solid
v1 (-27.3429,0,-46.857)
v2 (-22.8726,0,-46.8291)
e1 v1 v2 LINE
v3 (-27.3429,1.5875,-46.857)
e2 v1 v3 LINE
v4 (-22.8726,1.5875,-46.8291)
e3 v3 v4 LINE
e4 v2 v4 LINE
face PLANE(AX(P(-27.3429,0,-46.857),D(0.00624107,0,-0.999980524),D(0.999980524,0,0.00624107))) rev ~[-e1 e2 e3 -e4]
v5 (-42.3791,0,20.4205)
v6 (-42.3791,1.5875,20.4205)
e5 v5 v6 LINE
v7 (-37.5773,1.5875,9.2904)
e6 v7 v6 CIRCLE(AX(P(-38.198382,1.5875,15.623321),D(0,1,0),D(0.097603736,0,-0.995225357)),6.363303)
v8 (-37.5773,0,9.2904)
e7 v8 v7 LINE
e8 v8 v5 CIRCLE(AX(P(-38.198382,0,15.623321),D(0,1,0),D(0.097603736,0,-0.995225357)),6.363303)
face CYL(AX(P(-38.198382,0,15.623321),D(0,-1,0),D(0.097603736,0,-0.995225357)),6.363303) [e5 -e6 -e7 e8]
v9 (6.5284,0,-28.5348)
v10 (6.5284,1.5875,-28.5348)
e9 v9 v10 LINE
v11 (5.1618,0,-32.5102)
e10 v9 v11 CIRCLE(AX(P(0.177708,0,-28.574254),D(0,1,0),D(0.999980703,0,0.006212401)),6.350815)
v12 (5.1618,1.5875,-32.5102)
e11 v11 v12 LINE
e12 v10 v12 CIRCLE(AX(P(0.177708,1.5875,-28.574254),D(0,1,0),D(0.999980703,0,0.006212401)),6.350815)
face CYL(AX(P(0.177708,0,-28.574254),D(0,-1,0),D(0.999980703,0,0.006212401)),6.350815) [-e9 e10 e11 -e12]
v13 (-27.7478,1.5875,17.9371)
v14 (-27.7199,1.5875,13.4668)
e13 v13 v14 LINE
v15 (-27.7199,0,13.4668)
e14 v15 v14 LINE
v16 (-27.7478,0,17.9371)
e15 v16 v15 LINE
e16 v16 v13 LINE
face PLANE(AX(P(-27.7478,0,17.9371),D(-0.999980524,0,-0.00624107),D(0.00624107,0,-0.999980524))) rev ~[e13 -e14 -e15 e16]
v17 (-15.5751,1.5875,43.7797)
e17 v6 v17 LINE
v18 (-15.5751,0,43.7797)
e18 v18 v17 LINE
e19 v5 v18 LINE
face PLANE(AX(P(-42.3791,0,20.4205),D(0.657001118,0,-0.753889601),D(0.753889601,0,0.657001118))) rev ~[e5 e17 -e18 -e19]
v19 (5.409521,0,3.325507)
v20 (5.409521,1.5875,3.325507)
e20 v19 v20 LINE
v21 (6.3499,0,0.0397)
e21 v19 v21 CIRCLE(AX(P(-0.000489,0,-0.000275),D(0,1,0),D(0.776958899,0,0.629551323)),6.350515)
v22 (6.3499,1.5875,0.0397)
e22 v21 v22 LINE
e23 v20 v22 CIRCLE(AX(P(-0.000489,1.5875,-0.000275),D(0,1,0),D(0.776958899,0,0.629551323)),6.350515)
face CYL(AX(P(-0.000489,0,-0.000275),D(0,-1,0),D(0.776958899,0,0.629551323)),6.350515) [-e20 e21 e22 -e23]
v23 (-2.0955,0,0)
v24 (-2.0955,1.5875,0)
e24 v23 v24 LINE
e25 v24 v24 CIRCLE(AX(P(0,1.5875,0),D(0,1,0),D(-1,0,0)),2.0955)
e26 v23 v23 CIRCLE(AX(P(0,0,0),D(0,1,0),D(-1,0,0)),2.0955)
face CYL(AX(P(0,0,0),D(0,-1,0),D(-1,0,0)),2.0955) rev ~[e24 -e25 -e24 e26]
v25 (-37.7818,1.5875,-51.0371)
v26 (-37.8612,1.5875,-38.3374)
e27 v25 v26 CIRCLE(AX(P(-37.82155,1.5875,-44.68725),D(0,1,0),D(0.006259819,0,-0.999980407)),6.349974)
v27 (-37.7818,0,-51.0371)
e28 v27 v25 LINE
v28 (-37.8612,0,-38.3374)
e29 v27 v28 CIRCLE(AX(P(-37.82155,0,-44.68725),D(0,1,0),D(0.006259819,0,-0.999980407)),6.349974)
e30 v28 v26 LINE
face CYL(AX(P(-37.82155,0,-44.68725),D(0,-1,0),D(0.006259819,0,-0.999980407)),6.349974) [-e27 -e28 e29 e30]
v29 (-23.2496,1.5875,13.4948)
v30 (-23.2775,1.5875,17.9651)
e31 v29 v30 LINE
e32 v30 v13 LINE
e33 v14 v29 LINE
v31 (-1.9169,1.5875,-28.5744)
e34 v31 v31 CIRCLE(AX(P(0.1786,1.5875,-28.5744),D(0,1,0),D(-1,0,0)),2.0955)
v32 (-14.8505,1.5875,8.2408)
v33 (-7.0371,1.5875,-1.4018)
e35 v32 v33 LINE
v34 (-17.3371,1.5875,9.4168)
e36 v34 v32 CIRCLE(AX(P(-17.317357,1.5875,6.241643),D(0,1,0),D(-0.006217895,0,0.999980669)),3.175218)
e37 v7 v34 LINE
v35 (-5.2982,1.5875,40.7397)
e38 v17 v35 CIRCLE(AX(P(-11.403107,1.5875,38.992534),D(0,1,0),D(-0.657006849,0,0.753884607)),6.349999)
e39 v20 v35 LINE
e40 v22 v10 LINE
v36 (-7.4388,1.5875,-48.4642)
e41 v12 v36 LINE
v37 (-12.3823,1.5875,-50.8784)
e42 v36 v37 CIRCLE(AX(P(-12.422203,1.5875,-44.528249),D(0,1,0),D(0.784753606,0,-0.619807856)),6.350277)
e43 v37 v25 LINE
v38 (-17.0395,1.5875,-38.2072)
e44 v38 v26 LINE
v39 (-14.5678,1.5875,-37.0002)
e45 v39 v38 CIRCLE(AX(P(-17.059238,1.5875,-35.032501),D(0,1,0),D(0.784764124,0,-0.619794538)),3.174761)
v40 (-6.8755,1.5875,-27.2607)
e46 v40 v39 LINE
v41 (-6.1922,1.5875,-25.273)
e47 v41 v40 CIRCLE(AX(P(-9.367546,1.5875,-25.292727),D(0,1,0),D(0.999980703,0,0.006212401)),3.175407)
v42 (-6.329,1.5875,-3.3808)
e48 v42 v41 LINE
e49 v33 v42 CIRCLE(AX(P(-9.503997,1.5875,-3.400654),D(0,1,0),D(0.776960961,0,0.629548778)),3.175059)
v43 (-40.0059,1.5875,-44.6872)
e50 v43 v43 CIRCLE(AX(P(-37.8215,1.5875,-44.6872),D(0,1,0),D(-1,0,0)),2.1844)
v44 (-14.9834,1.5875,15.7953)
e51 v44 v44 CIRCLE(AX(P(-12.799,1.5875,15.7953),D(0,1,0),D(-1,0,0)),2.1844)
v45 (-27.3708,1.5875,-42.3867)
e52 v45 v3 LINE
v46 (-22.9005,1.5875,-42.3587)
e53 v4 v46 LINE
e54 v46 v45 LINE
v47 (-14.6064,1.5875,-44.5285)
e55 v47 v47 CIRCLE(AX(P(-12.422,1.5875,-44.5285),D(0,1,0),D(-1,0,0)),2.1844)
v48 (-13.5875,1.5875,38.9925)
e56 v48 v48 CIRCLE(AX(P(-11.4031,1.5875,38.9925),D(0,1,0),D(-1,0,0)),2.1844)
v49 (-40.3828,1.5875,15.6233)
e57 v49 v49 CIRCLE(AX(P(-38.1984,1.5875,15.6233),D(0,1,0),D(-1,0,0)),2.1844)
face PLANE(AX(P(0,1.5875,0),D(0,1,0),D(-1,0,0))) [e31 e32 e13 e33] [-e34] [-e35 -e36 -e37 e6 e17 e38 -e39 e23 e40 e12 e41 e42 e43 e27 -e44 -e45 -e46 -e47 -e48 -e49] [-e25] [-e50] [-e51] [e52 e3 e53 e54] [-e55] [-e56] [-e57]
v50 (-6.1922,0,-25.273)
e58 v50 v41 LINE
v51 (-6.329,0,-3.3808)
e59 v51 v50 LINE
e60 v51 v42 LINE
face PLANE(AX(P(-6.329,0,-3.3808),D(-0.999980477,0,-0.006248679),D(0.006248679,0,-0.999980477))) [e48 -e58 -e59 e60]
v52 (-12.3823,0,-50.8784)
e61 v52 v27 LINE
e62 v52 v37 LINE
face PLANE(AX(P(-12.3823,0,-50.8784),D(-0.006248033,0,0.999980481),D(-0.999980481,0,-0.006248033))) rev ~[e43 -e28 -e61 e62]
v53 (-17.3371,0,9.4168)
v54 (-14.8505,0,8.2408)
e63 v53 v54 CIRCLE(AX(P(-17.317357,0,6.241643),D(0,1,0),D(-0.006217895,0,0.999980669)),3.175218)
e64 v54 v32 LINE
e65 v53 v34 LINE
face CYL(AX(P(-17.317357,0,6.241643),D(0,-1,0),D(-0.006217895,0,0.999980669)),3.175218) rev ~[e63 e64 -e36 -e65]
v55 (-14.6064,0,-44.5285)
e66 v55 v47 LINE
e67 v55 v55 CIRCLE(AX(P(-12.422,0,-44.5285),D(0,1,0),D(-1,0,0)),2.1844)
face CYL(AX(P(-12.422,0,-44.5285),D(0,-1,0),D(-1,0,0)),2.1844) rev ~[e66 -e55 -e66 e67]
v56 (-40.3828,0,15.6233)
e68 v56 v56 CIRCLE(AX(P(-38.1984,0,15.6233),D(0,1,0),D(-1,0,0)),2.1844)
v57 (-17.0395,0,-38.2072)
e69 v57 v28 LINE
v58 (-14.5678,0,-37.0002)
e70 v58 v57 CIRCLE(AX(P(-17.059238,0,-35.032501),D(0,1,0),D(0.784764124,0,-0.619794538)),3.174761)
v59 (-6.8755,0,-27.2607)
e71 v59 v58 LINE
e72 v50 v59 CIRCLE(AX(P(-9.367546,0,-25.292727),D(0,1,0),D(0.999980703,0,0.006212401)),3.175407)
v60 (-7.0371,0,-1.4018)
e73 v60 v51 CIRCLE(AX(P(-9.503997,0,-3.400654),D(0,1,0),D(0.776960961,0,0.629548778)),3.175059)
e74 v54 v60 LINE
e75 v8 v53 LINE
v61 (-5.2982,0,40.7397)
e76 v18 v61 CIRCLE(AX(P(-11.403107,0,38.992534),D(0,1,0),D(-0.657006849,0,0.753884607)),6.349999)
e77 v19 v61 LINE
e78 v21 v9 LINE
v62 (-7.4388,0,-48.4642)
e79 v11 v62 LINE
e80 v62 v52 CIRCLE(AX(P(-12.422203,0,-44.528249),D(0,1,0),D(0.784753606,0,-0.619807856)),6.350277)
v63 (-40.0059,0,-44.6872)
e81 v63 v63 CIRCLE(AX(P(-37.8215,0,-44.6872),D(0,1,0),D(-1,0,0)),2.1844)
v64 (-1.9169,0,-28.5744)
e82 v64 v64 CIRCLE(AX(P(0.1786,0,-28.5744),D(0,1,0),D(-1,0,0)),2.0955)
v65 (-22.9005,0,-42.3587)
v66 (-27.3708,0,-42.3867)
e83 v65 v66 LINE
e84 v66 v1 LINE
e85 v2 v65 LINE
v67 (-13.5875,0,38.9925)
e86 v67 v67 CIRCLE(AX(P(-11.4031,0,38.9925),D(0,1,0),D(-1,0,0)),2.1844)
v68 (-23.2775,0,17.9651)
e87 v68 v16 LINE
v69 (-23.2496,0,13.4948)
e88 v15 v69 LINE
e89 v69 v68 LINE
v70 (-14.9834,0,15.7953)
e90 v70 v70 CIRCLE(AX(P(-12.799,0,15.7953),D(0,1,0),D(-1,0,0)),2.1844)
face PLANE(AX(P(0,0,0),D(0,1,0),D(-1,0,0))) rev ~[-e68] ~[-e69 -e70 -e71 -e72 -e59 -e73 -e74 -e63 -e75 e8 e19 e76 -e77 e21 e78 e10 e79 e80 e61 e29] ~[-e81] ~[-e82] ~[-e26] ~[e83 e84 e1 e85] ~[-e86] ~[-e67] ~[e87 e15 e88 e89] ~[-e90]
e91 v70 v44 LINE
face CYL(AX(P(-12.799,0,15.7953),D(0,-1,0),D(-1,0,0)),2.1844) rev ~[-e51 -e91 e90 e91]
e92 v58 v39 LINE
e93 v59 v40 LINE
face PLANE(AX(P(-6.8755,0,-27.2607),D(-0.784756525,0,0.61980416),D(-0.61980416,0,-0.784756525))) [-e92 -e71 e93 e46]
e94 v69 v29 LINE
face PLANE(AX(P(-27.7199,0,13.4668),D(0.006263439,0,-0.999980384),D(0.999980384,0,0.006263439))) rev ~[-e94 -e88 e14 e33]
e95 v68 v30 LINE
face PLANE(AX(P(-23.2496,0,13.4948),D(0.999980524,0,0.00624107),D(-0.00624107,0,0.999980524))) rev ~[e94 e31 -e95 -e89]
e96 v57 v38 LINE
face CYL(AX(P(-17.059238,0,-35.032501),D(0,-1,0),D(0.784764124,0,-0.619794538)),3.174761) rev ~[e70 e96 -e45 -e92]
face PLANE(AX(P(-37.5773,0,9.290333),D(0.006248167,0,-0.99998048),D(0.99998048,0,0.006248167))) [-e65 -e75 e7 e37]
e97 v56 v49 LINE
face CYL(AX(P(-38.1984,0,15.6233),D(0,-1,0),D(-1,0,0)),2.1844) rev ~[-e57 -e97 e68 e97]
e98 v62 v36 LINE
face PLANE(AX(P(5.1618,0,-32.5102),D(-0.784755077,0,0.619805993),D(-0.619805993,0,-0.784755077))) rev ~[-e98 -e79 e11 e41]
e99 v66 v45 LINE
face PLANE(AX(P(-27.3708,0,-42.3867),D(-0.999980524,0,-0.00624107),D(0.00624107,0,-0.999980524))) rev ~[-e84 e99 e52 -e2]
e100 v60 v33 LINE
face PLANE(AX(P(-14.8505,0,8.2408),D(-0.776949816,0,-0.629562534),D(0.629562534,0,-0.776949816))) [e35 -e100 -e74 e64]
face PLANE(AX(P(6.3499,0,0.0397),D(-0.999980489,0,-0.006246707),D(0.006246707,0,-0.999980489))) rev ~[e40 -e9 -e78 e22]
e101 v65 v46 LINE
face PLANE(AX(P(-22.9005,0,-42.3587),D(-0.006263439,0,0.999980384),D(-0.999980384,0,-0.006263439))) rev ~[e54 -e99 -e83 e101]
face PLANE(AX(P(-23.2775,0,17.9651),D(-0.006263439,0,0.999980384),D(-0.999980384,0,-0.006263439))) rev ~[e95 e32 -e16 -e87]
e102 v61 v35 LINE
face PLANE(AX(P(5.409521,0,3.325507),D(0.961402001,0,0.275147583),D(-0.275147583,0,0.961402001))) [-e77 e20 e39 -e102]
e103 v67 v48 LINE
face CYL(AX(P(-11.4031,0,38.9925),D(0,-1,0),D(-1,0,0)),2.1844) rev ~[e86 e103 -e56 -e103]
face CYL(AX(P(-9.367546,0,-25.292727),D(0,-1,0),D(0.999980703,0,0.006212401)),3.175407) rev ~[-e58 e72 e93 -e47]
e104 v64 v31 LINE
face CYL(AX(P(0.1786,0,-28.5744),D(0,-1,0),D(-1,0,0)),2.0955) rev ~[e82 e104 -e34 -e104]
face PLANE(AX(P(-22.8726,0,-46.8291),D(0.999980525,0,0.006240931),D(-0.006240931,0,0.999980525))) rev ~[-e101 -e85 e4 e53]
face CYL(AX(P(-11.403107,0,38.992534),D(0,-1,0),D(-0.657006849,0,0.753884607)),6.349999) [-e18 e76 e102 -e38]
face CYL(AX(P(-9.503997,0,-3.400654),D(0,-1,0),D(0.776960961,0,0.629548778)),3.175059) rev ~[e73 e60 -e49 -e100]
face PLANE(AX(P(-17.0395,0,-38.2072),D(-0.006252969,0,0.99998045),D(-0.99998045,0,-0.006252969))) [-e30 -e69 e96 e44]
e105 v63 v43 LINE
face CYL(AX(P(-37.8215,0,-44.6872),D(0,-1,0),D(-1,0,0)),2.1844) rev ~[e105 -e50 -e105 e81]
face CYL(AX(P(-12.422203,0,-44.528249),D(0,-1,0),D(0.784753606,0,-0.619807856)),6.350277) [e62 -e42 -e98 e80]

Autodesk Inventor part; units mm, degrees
ref_plane "YZ Plane" through (0, 0, 0) normal (1, 0, 0) x (0, 1, 0)
ref_plane "XZ Plane" through (0, 0, 0) normal (0, 1, 0) x (-1, 0, 0)
ref_plane "XY Plane" through (0, 0, 0) normal (0, 0, 1) x (1, 0, 0)
sketch "main_gusset" plane through (0, 0, 0) normal (0, 0, 1) x (1, 0, 0)
  circle A0 centre (-10.4381, -28.24) radius 2.1844
  arc A1 (-15.3966, -32.2068) -> (-10.4381, -34.59) centre (-10.4381, -28.24) ccw
  circle A2 centre (-23.1381, -12.365) radius 2.0955
  line L0 (-16.7881, 12.8688) -> (-16.7881, -9.0238)
  line L1 (-29.4881, 16.21) -> (-29.4881, -12.365)
  arc A3 (-16.7881, -9.0238) -> (-16.0924, -11.0072) centre (-13.6131, -9.0238) ccw
  arc A4 (-29.4881, -12.365) -> (-28.0966, -16.3318) centre (-23.1381, -12.365) ccw
  line L2 (-16.0924, -11.0072) -> (-8.3394, -20.6984)
  arc A5 (-8.3394, -20.6984) -> (-5.8602, -21.89) centre (-5.8602, -18.715) ccw
  line L3 (-28.0966, -16.3318) -> (-15.3966, -32.2068)
  line L4 (-10.4381, -34.59) -> (14.9619, -34.59)
  circle A6 centre (-10.4381, 32.085) radius 2.1844
  circle A7 centre (14.9619, 32.0717) radius 2.1844
  arc A8 (-10.4381, 38.435) -> (-15.3966, 36.0518) centre (-10.4381, 32.085) ccw
  arc A9 (14.3804, 25.735) -> (14.9619, 38.435) centre (14.9619, 32.0717) ccw
  line L5 (14.9619, 38.435) -> (-10.4381, 38.435)
  circle A10 centre (-23.1381, 16.21) radius 2.0955
  line L6 (14.9619, 25.735) -> (-5.8602, 25.735)
  arc A11 (-16.0924, 14.8522) -> (-16.7881, 12.8688) centre (-13.6131, 12.8688) ccw
  arc A12 (-28.0966, 20.1768) -> (-29.4881, 16.21) centre (-23.1381, 16.21) ccw
  line L7 (-8.3394, 24.5434) -> (-16.0924, 14.8522)
  arc A13 (-5.8602, 25.735) -> (-8.3394, 24.5434) centre (-5.8602, 22.56) ccw
  line L8 (-28.0966, 20.1768) -> (-15.3966, 36.0518)
  circle A14 centre (14.9619, -28.24) radius 2.1844
  arc A15 (14.9619, -34.59) -> (14.9619, -21.89) centre (14.9619, -28.24) ccw
  line L9 (-5.8602, -21.89) -> (14.9619, -21.89)
  line L10 (0.0267, 34.3202) -> (4.4971, 34.3202)
  line L11 (4.4971, 34.3202) -> (4.4971, 29.8498)
  line L12 (4.4971, 29.8498) -> (0.0267, 29.8498)
  line L13 (0.0267, 29.8498) -> (0.0267, 34.3202)
  line L14 (0.0267, 34.3202) -> (4.4971, 29.8498) construction
  line L15 (4.4971, 34.3202) -> (0.0267, 29.8498) construction
  line L16 (0.0267, -26.0048) -> (4.4971, -26.0048)
  line L17 (4.4971, -26.0048) -> (4.4971, -30.4752)
  line L18 (4.4971, -30.4752) -> (0.0267, -30.4752)
  line L19 (0.0267, -30.4752) -> (0.0267, -26.0048)
  line L20 (0.0267, -26.0048) -> (4.4971, -30.4752) construction
  line L21 (4.4971, -26.0048) -> (0.0267, -30.4752) construction
  point P0 (-1.5323, 2.5213)
  point P1 (2.2619, 32.085)
  point P2 (2.2619, -28.24)
  dimension "d0" = 12.7
  dimension "d1" = 12.7
  dimension "d2" = 12.7
  dimension "d3" = 3.175
  dimension "d6" = 4.4704
  dimension "d7" = 4.4704
  dimension "d8" = 4.4704
  dimension "d9" = 4.4704
  dimension "d10" = 12.7
  dimension "d11" = 12.7
  dimension "d12" = 6.35
  dimension "d13" = 6.35
  dimension "d14" = 15.875
  dimension "d15" = 15.875
  dimension "d16" = 12.7
sketch "Sketch1" plane through (0, 0, 0) normal (0, 1, 0) x (-1, 0, 0)
  arc A0 (15.5751, 43.7797) -> (5.2982, 40.7397) centre (11.4031, 38.9925) ccw
  line L0 (42.3791, 20.4205) -> (15.5751, 43.7797)
  line L1 (-6.3499, 0.0397) -> (5.2982, 40.7397)
  circle A1 centre (11.4031, 38.9925) radius 2.1844 projected
  arc A2 (15.5751, 43.7797) -> (5.2982, 40.7397) centre (11.4031, 38.9925) ccw
  circle A3 centre (12.422, -44.5285) radius 2.1844
  arc A4 (7.4388, -48.4642) -> (12.3823, -50.8784) centre (12.422, -44.5285) ccw
  circle A5 centre (-0.1786, -28.5744) radius 2.0955
  line L2 (6.329, -3.3808) -> (6.1922, -25.273)
  line L3 (-6.3499, 0.0397) -> (-6.5284, -28.5348)
  arc A6 (6.1922, -25.273) -> (6.8755, -27.2607) centre (9.3671, -25.2928) ccw
  arc A7 (-6.5284, -28.5348) -> (-5.1618, -32.5102) centre (-0.1786, -28.5744) ccw
  line L4 (6.8755, -27.2607) -> (14.5678, -37.0002)
  arc A8 (14.5678, -37.0002) -> (17.0395, -38.2072) centre (17.0594, -35.0323) ccw
  line L5 (-5.1618, -32.5102) -> (7.4388, -48.4642)
  line L6 (12.3823, -50.8784) -> (37.7818, -51.0371)
  circle A9 centre (12.799, 15.7953) radius 2.1844
  circle A10 centre (38.1984, 15.6233) radius 2.1844
  arc A11 (12.8386, 22.1452) -> (7.8653, 19.793) centre (12.799, 15.7953) ccw
  arc A12 (37.5773, 9.2904) -> (38.2381, 21.9865) centre (38.1984, 15.6233) ccw
  line L7 (38.2381, 21.9865) -> (12.8386, 22.1452)
  circle A13 centre (0, 0) radius 2.0955
  line L8 (38.1588, 9.2867) -> (17.3371, 9.4168)
  arc A14 (7.0371, -1.4018) -> (6.329, -3.3808) centre (9.5039, -3.4006) ccw
  arc A15 (-4.9336, 3.9977) -> (-6.3499, 0.0397) centre (0, 0) ccw
  line L9 (14.8505, 8.2408) -> (7.0371, -1.4018)
  arc A16 (17.3371, 9.4168) -> (14.8505, 8.2408) centre (17.3173, 6.2419) ccw
  line L10 (-4.9336, 3.9977) -> (7.8653, 19.793)
  circle A17 centre (37.8215, -44.6872) radius 2.1844
  arc A18 (37.7818, -51.0371) -> (37.8612, -38.3374) centre (37.8215, -44.6872) ccw
  line L11 (17.0395, -38.2072) -> (37.8612, -38.3374)
  line L12 (23.2775, 17.9651) -> (27.7478, 17.9371)
  line L13 (27.7478, 17.9371) -> (27.7199, 13.4668)
  line L14 (27.7199, 13.4668) -> (23.2496, 13.4948)
  line L15 (23.2496, 13.4948) -> (23.2775, 17.9651)
  line L16 (23.2775, 17.9651) -> (27.7199, 13.4668) construction
  line L17 (27.7478, 17.9371) -> (23.2496, 13.4948) construction
  line L18 (22.9005, -42.3587) -> (27.3708, -42.3867)
  line L19 (27.3708, -42.3867) -> (27.3429, -46.857)
  line L20 (27.3429, -46.857) -> (22.8726, -46.8291)
  line L21 (22.8726, -46.8291) -> (22.9005, -42.3587)
  line L22 (22.9005, -42.3587) -> (27.3429, -46.857) construction
  line L23 (27.3708, -42.3867) -> (22.8726, -46.8291) construction
  point P0 (0, 0)
  point P1 (42.3791, 20.4205)
  point P2 (-6.3499, 0.0397)
  point P3 (-5.4094, 3.3258)
  point P4 (-6.3499, 0.0397)
  dimension "d18" = 12.7
extrude "Extrusion1" add sketch "Sketch1" along normal blind 1.5875
properties part number "funnel_gusset" material "Acetal Resin, White"
